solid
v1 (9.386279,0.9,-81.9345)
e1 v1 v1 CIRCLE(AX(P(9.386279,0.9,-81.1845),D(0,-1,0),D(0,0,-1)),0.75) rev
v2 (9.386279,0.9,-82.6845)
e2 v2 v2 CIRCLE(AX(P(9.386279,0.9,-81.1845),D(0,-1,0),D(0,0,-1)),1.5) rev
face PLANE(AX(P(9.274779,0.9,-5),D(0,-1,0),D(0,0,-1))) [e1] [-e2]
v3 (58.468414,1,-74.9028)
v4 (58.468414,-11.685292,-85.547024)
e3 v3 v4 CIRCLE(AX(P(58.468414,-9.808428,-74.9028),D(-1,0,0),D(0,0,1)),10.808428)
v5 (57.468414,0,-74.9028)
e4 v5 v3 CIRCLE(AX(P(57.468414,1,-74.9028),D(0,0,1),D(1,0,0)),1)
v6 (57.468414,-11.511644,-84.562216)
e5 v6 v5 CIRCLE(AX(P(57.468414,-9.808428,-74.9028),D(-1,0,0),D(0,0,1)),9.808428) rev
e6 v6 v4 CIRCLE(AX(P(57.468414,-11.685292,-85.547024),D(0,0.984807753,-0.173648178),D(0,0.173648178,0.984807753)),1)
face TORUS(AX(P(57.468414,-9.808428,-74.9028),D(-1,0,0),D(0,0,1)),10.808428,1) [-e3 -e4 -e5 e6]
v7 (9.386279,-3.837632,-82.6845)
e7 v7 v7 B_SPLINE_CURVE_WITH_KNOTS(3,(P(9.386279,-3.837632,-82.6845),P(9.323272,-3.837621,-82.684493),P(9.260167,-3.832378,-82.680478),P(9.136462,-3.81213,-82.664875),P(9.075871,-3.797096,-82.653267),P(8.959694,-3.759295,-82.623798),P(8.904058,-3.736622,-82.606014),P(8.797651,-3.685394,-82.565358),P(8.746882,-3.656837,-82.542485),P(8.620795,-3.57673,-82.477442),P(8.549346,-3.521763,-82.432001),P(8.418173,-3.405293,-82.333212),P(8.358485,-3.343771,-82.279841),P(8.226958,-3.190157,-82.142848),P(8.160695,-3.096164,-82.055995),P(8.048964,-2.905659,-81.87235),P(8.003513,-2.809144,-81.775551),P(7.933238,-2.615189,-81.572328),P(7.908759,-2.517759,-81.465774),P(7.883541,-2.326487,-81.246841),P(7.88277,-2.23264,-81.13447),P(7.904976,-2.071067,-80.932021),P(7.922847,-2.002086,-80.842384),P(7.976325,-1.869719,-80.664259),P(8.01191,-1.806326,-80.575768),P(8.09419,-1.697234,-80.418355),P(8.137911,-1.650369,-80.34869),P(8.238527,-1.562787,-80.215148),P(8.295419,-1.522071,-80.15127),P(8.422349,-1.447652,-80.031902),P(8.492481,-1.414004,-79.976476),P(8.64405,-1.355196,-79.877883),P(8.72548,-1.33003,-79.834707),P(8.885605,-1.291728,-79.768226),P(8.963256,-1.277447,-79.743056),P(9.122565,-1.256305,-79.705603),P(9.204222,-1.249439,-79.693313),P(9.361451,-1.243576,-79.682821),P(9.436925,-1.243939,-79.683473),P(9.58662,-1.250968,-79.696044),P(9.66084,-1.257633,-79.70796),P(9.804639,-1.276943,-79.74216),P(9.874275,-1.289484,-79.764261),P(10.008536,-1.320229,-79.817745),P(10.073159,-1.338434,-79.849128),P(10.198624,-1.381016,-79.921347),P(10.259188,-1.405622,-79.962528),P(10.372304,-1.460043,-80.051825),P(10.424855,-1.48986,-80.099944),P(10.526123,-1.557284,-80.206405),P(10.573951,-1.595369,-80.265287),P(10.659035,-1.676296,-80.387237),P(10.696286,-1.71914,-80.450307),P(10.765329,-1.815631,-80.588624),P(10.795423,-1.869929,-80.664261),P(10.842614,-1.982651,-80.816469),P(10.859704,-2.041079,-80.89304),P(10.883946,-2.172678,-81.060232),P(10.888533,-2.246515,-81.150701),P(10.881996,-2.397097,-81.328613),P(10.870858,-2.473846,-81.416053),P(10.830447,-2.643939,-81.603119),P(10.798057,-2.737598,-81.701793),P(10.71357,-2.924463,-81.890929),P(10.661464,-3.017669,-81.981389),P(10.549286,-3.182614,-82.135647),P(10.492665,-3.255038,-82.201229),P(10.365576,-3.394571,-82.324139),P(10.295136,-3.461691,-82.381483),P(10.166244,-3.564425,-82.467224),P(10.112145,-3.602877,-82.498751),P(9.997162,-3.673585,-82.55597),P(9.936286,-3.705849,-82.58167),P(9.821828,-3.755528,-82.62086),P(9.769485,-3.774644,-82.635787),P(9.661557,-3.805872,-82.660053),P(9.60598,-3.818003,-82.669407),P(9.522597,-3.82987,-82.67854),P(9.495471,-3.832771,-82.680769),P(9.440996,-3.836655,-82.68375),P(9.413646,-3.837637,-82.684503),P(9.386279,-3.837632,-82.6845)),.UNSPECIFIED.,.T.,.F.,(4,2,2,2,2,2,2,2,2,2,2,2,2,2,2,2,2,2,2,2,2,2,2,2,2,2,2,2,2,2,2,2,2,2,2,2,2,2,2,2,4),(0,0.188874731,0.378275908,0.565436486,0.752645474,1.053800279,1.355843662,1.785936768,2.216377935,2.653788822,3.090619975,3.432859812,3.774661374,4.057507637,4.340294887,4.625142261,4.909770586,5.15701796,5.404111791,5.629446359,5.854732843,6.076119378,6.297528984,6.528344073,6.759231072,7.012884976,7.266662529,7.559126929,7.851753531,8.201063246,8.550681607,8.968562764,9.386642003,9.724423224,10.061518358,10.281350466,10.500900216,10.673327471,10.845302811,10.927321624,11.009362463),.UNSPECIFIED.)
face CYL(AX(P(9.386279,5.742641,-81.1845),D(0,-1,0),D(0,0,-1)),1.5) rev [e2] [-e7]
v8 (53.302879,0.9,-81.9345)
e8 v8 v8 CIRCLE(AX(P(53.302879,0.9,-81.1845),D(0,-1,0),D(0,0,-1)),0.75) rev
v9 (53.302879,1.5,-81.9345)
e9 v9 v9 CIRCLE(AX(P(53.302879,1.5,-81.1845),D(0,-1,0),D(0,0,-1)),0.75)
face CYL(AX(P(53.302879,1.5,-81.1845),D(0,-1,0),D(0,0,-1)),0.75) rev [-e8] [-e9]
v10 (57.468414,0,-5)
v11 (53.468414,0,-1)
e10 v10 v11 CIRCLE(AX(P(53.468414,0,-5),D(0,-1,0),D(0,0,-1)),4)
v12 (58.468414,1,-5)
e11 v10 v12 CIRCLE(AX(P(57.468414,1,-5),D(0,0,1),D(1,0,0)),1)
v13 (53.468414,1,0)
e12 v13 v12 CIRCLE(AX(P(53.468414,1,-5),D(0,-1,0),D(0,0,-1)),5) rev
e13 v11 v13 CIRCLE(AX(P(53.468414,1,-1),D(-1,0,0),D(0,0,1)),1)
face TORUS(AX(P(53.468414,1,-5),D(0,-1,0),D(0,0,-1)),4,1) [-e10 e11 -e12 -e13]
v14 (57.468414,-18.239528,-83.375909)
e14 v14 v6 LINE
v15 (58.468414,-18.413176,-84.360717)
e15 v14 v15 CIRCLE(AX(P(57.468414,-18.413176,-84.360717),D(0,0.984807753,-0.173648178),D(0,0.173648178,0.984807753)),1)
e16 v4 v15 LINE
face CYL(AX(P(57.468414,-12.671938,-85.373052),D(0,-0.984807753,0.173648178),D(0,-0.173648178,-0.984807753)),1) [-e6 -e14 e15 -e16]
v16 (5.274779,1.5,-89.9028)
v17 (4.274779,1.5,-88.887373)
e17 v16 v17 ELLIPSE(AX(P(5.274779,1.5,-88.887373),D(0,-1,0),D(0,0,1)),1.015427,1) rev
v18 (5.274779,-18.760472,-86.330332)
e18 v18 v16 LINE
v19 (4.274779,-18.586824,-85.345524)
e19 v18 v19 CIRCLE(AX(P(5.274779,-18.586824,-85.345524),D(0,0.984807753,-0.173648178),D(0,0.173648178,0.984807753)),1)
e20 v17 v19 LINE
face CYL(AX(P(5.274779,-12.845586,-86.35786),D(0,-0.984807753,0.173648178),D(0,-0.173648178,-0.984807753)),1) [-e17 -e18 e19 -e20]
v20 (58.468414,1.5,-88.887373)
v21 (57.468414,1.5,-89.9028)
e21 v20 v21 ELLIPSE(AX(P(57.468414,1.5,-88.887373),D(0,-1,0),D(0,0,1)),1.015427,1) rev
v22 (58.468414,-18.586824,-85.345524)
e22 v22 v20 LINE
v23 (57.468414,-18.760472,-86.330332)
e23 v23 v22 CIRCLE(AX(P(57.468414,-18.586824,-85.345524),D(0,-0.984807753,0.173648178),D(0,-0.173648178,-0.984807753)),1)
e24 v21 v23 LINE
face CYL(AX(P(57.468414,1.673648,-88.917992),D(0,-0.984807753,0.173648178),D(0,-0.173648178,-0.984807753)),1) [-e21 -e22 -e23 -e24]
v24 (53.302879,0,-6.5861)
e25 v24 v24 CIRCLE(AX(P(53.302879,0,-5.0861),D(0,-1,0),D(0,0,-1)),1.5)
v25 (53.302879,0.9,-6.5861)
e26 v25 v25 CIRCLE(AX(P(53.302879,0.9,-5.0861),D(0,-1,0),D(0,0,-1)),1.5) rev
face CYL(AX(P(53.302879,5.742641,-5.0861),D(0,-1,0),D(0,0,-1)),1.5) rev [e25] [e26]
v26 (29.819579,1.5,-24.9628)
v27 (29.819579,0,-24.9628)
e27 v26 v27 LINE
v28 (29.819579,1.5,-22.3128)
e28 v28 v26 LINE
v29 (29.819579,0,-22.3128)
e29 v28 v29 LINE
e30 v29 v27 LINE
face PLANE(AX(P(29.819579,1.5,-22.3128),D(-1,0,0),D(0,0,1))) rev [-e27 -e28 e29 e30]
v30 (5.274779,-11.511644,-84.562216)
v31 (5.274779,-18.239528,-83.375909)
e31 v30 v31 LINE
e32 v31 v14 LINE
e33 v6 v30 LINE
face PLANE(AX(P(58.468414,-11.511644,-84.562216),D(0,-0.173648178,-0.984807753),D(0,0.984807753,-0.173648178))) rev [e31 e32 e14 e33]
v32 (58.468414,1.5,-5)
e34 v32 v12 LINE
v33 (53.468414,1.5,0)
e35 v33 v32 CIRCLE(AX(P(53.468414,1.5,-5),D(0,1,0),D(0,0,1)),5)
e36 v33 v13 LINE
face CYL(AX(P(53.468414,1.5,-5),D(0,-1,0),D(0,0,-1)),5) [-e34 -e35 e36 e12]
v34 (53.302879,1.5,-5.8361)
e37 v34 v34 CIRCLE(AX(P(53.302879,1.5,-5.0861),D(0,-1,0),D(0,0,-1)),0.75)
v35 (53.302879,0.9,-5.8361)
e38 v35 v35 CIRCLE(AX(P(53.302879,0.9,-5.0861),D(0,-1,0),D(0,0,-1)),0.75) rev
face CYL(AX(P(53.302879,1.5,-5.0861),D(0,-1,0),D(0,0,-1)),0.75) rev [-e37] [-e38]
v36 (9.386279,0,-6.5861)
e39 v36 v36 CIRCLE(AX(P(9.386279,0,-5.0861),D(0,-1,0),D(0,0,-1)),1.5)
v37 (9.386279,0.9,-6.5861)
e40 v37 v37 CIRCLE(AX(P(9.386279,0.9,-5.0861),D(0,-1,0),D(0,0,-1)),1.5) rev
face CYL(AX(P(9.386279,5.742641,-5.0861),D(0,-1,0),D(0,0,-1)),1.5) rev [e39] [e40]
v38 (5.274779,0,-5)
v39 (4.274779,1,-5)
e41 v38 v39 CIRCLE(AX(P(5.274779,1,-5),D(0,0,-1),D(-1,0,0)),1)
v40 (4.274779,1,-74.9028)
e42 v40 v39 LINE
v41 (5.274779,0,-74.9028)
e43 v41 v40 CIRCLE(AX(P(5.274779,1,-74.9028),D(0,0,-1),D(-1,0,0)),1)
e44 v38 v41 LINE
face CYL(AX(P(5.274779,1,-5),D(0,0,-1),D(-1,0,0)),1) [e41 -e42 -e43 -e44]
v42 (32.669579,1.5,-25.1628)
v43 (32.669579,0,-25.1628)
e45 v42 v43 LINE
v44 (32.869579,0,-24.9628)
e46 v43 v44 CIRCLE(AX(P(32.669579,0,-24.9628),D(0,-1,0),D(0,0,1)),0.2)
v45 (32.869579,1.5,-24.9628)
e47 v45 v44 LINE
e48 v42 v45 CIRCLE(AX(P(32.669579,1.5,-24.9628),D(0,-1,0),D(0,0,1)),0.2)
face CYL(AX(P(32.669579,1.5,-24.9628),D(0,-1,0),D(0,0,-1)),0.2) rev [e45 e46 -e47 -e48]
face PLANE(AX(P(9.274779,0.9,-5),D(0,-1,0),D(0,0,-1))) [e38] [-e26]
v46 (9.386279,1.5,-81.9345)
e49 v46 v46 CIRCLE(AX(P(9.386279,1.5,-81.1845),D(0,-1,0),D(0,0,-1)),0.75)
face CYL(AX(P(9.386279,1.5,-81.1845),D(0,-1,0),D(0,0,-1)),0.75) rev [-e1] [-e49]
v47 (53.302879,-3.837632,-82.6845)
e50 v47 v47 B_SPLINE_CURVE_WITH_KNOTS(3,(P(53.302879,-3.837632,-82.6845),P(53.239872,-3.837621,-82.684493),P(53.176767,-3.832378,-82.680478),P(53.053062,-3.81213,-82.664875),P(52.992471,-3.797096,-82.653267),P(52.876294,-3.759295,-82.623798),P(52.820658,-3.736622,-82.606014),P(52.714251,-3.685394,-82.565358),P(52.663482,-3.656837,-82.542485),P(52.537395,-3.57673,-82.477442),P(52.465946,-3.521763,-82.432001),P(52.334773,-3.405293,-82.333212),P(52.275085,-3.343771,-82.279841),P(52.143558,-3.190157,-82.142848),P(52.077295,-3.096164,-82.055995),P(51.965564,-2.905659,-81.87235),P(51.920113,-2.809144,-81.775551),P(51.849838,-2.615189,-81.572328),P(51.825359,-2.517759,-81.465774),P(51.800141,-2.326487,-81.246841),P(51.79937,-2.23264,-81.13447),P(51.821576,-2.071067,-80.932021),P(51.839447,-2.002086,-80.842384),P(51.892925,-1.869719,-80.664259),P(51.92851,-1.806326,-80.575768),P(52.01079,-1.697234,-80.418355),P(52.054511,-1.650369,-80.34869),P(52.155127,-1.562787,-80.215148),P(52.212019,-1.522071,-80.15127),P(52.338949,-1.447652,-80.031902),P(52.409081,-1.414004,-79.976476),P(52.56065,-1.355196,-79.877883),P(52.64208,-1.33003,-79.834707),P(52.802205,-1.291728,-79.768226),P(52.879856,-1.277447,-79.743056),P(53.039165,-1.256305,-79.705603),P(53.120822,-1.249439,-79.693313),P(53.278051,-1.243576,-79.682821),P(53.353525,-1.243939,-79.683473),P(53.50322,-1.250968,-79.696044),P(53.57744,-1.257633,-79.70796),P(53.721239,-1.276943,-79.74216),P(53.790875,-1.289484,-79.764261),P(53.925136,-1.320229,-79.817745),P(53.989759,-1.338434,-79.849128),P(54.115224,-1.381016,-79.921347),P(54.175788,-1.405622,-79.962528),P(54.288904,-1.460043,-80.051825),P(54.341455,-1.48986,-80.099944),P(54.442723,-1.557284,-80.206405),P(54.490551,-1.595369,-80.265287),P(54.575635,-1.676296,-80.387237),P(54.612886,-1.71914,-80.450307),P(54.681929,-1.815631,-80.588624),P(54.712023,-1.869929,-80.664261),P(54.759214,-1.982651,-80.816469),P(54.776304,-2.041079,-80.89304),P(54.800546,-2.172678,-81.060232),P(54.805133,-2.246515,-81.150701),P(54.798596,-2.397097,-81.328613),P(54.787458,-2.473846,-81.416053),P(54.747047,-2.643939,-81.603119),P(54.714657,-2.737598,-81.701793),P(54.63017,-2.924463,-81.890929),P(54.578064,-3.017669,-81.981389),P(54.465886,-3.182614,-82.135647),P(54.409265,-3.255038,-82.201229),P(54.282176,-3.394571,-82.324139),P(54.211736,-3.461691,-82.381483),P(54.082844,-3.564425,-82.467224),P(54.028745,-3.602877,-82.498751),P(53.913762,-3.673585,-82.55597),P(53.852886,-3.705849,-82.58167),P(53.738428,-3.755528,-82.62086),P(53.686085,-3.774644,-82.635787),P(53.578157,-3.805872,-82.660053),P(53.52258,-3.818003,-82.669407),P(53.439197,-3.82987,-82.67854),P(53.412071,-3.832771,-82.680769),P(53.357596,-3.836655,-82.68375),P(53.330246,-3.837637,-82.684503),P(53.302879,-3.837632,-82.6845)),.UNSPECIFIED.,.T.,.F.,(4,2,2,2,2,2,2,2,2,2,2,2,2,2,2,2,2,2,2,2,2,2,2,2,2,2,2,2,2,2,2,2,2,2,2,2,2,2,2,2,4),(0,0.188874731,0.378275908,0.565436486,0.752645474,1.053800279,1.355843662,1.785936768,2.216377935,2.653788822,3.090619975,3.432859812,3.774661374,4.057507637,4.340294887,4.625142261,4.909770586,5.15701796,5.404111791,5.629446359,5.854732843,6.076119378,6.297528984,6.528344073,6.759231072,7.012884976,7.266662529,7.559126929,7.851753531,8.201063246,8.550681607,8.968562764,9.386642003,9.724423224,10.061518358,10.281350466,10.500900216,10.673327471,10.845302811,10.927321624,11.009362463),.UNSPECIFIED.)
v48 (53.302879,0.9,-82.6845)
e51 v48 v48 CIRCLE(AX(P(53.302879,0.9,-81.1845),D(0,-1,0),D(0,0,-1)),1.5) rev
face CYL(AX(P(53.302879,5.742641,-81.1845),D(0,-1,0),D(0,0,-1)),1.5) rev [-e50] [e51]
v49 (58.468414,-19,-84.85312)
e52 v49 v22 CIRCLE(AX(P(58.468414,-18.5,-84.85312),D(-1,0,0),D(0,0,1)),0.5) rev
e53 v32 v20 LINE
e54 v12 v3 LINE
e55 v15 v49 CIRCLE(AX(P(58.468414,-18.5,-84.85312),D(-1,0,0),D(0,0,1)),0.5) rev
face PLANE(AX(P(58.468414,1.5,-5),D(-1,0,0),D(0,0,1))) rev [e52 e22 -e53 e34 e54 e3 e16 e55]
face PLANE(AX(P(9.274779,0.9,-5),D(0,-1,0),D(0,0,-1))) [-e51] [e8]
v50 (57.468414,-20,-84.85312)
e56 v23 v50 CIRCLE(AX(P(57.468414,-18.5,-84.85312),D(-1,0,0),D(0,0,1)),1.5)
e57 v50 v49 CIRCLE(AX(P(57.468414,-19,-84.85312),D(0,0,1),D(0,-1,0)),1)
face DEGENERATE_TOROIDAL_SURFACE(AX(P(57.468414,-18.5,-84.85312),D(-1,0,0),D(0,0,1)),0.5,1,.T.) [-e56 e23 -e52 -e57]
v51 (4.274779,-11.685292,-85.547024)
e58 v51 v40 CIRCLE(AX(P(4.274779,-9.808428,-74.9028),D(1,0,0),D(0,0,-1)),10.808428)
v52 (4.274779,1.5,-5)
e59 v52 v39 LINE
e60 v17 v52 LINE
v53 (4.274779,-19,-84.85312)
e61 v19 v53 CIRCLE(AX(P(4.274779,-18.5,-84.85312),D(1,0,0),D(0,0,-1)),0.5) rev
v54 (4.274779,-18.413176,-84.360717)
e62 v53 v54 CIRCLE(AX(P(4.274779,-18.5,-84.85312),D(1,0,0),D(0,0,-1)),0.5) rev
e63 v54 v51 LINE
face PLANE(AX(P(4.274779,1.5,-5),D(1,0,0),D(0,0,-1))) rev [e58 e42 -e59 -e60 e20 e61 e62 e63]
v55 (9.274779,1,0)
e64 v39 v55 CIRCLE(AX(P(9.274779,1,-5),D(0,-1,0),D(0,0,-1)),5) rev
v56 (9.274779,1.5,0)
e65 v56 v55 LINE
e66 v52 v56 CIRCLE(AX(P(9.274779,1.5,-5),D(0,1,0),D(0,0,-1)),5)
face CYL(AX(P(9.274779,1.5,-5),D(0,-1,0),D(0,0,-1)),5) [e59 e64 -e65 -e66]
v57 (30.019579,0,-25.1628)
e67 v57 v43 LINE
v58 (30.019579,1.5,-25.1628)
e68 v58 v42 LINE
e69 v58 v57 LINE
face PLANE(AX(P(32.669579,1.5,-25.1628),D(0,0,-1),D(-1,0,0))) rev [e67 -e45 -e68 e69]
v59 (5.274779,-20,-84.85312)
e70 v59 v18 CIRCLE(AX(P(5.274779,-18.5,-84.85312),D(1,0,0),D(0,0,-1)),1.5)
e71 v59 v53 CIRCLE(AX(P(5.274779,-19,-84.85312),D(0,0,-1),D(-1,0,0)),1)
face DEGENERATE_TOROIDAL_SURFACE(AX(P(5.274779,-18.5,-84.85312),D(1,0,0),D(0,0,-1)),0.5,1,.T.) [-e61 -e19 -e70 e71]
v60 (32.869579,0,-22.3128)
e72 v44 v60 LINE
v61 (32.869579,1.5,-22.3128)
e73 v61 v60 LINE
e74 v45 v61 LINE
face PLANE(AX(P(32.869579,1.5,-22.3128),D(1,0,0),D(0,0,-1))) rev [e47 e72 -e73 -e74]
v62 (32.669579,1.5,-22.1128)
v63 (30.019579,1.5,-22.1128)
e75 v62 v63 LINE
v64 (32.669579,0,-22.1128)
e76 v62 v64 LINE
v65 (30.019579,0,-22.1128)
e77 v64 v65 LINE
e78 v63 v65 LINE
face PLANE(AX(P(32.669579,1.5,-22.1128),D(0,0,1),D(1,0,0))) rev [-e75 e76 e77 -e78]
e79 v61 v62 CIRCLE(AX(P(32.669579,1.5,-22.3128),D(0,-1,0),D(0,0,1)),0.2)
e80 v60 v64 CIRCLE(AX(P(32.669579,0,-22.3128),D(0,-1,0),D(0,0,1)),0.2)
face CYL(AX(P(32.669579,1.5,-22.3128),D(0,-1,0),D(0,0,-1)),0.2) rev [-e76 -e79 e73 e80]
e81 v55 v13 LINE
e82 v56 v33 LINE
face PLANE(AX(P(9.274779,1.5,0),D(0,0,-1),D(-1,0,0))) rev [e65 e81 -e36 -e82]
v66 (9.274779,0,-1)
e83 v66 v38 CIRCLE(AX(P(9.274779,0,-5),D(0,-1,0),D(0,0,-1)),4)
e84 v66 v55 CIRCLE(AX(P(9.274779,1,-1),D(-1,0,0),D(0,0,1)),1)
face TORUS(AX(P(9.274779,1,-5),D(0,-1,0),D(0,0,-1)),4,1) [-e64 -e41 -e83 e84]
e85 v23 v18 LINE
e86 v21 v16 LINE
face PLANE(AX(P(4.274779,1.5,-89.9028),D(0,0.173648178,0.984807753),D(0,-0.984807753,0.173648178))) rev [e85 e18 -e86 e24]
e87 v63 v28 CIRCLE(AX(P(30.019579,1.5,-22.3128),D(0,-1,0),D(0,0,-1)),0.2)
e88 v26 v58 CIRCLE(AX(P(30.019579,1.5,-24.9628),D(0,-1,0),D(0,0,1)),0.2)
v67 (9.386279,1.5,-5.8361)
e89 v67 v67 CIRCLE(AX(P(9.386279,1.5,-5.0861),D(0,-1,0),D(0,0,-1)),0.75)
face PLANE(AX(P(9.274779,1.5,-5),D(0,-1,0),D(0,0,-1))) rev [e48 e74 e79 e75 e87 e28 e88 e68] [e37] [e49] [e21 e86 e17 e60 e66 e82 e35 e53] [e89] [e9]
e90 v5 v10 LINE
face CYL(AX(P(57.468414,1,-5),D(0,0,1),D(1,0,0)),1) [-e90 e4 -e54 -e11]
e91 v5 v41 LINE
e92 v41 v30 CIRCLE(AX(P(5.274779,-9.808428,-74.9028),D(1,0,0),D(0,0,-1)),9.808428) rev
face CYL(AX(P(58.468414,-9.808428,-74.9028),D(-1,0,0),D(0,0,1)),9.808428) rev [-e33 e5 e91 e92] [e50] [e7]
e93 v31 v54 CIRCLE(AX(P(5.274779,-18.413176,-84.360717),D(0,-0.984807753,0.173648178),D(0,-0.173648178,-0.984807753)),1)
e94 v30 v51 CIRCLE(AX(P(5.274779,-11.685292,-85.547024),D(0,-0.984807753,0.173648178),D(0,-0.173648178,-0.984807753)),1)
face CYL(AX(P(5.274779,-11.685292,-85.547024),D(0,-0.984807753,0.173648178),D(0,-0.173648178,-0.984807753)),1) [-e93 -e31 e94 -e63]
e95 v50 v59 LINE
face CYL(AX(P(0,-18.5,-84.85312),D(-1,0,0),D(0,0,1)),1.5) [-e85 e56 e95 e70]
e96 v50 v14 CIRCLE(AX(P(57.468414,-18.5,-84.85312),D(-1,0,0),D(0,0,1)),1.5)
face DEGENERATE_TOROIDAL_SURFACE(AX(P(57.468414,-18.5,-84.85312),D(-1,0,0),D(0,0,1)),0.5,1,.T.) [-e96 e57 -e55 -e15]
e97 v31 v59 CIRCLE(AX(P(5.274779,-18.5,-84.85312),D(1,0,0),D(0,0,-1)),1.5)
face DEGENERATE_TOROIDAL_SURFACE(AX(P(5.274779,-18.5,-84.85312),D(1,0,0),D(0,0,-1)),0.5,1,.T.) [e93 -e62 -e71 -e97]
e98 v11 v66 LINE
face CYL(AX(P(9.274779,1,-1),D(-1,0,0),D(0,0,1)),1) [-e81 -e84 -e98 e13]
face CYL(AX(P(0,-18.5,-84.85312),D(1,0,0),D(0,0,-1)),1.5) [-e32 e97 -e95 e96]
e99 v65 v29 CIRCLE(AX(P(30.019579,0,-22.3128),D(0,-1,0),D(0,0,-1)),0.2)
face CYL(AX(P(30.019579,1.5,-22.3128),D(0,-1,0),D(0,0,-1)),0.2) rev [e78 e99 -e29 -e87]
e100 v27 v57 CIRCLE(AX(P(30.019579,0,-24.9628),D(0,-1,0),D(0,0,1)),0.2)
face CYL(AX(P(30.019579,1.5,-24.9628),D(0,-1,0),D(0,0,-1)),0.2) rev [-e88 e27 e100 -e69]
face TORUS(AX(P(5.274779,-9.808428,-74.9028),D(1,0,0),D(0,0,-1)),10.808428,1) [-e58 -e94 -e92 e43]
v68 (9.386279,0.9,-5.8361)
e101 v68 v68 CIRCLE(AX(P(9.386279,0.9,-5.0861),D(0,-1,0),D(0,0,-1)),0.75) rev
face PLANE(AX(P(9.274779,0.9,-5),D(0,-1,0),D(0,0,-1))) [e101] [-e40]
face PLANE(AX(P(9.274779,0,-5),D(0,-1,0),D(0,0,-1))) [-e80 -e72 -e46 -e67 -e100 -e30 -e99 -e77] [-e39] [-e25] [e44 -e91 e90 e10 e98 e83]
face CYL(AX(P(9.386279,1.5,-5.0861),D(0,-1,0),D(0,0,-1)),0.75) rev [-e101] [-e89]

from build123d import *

# Parameters (mm, degrees)
BOSS_EXTRUDE1_DEPTH = 1.5
SKETCH3_W           = 54.19363593
SKETCH3_H           = 15
BOSS_EXTRUDE2_DEPTH = 20
CUT_EXTRUDE2_DEPTH  = 107.861890415
CUT_EXTRUDE4_DEPTH  = 107.861890415
FILLET1_R           = 1.5
SKETCH7_R           = 0.75
CUT_EXTRUDE5_DEPTH  = 109.286974912
SKETCH9_R           = 1.5
CUT_EXTRUDE6_DEPTH  = 5.9
FILLET2_R           = 1
CUT_EXTRUDE7_DEPTH  = 110.092020548


with BuildPart() as part:
    # Sketch1 → Boss-Extrude1 (new body)
    with BuildSketch(Plane(origin=(0, 0, 0), x_dir=(1, 0, 0), z_dir=(0, 1, 0))):
        with BuildLine():
            Line((9.274778516, 0), (53.468414446, 0))
            ThreePointArc((53.468414446, 0), (57.003948352, 1.464466094), (58.468414446, 5))
            Line((58.468414446, 5), (58.468414446, 89.9028))
            Line((58.468414446, 89.9028), (4.274778516, 89.9028))
            Line((4.274778516, 89.9028), (4.274778516, 5))
            ThreePointArc((4.274778516, 5), (5.73924461, 1.464466094), (9.274778516, 0))
        make_face()
    extrude(amount=BOSS_EXTRUDE1_DEPTH)

    # Sketch3 → Boss-Extrude2 (add)
    with BuildSketch(Plane.XZ):
        with Locations((31.371596481, -82.4028)):
            Rectangle(SKETCH3_W, SKETCH3_H)
    extrude(amount=BOSS_EXTRUDE2_DEPTH)

    # Sketch2 → Cut-Extrude2 (cut, through all)
    with BuildSketch(Plane(origin=(58.468414446, 0, 0), x_dir=(0, 0, -1), z_dir=(1, 0, 0))):
        Polygon((89.9028, 1.5), (86.111769915, -20), (89.9028, -20), align=None)
    extrude(amount=-CUT_EXTRUDE2_DEPTH, mode=Mode.SUBTRACT)

    # Sketch4 → Cut-Extrude4 (cut, through all)
    with BuildSketch(Plane.ZY.offset(-4.274778516)):
        with BuildLine():
            Line((-74.9028, 0), (-74.9028, -20))
            Line((-74.9028, -20), (-83.065490079, -20))
            Line((-83.065490079, -20), (-84.562216259, -11.511644029))
            ThreePointArc((-84.562216259, -11.511644029), (-82.416492014, -3.503692127), (-74.9028, 0))
        make_face()
    extrude(amount=-CUT_EXTRUDE4_DEPTH, mode=Mode.SUBTRACT)

    # Fillet1
    fillet1_edges = [part.edges().sort_by_distance(p)[0] for p in [
        (31.371596481, -20, -86.111769915),
        (31.371596481, -20, -83.065490079),
    ]]
    fillet(fillet1_edges, radius=FILLET1_R - 0.0001)  # a hair under: the kernel refuses the full size

    # Sketch7 → Cut-Extrude5 (cut, through all)
    with BuildSketch(Plane(origin=(0, -5, 0), x_dir=(-1, 0, 0), z_dir=(0, -1, 0))):
        with Locations(Location((-53.302878516, 5.0861, 0), (0, 0, 90))):
            Circle(SKETCH7_R)
        with Locations(Location((-9.386278516, 5.0861, 0), (0, 0, 90))):
            Circle(SKETCH7_R)
        with Locations(Location((-9.386278516, 81.1845, 0), (0, 0, 90))):
            Circle(SKETCH7_R)
        with Locations(Location((-53.302878516, 81.1845, 0), (0, 0, 90))):
            Circle(SKETCH7_R)
    extrude(amount=-CUT_EXTRUDE5_DEPTH, mode=Mode.SUBTRACT)

    # Sketch9 → Cut-Extrude6 (cut)
    with BuildSketch(Plane(origin=(0, -5, 0), x_dir=(-1, 0, 0), z_dir=(0, -1, 0))):
        with Locations(Location((-53.302878516, 5.0861, 0), (0, 0, 90))):
            Circle(SKETCH9_R)
        with Locations(Location((-9.386278516, 5.0861, 0), (0, 0, 90))):
            Circle(SKETCH9_R)
        with Locations(Location((-9.386278516, 81.1845, 0), (0, 0, 90))):
            Circle(SKETCH9_R)
        with Locations(Location((-53.302878516, 81.1845, 0), (0, 0, 90))):
            Circle(SKETCH9_R)
    extrude(amount=-CUT_EXTRUDE6_DEPTH, mode=Mode.SUBTRACT)

    # Fillet2
    fillet2_edges = [part.edges().sort_by_distance(p)[0] for p in [
        (4.274778516, 0, -39.9514),
        (4.274778516, -8.630277451, -88.116558763),
        (58.468414446, -8.630277451, -88.116558763),
        (58.468414446, -3.503692127, -82.416492014),
        (58.468414446, -14.875644564, -83.969052201),
        (4.274778516, -3.503692127, -82.416492014),
        (4.274778516, -14.875644564, -83.969052201),
        (58.468414446, -19.464217136, -83.704011232),
        (58.468414446, -19.64909006, -85.817321514),
        (4.274778516, -19.464217136, -83.704011232),
        (4.274778516, -19.64909006, -85.817321514),
        (57.003948352, 0, -1.464466094),
        (31.371596481, 0, 0),
        (5.73924461, 0, -1.464466094),
        (58.468414446, 0, -39.9514),
    ]]
    fillet(fillet2_edges, radius=FILLET2_R)

    # Sketch10 → Cut-Extrude7 (cut, through all)
    with BuildSketch(Plane.XZ):
        with BuildLine():
            Line((32.669578516, -22.1128), (30.019578516, -22.1128))
            ThreePointArc((30.019578516, -22.1128), (29.87815716, -22.171378644), (29.819578516, -22.3128))
            Line((29.819578516, -22.3128), (29.819578516, -24.9628))
            ThreePointArc((29.819578516, -24.9628), (29.87815716, -25.104221356), (30.019578516, -25.1628))
            Line((30.019578516, -25.1628), (32.669578516, -25.1628))
            ThreePointArc((32.669578516, -25.1628), (32.810999872, -25.104221356), (32.869578516, -24.9628))
            Line((32.869578516, -24.9628), (32.869578516, -22.3128))
            ThreePointArc((32.869578516, -22.3128), (32.810999872, -22.171378644), (32.669578516, -22.1128))
        make_face()
    extrude(amount=-CUT_EXTRUDE7_DEPTH, mode=Mode.SUBTRACT)


solid = part.part
